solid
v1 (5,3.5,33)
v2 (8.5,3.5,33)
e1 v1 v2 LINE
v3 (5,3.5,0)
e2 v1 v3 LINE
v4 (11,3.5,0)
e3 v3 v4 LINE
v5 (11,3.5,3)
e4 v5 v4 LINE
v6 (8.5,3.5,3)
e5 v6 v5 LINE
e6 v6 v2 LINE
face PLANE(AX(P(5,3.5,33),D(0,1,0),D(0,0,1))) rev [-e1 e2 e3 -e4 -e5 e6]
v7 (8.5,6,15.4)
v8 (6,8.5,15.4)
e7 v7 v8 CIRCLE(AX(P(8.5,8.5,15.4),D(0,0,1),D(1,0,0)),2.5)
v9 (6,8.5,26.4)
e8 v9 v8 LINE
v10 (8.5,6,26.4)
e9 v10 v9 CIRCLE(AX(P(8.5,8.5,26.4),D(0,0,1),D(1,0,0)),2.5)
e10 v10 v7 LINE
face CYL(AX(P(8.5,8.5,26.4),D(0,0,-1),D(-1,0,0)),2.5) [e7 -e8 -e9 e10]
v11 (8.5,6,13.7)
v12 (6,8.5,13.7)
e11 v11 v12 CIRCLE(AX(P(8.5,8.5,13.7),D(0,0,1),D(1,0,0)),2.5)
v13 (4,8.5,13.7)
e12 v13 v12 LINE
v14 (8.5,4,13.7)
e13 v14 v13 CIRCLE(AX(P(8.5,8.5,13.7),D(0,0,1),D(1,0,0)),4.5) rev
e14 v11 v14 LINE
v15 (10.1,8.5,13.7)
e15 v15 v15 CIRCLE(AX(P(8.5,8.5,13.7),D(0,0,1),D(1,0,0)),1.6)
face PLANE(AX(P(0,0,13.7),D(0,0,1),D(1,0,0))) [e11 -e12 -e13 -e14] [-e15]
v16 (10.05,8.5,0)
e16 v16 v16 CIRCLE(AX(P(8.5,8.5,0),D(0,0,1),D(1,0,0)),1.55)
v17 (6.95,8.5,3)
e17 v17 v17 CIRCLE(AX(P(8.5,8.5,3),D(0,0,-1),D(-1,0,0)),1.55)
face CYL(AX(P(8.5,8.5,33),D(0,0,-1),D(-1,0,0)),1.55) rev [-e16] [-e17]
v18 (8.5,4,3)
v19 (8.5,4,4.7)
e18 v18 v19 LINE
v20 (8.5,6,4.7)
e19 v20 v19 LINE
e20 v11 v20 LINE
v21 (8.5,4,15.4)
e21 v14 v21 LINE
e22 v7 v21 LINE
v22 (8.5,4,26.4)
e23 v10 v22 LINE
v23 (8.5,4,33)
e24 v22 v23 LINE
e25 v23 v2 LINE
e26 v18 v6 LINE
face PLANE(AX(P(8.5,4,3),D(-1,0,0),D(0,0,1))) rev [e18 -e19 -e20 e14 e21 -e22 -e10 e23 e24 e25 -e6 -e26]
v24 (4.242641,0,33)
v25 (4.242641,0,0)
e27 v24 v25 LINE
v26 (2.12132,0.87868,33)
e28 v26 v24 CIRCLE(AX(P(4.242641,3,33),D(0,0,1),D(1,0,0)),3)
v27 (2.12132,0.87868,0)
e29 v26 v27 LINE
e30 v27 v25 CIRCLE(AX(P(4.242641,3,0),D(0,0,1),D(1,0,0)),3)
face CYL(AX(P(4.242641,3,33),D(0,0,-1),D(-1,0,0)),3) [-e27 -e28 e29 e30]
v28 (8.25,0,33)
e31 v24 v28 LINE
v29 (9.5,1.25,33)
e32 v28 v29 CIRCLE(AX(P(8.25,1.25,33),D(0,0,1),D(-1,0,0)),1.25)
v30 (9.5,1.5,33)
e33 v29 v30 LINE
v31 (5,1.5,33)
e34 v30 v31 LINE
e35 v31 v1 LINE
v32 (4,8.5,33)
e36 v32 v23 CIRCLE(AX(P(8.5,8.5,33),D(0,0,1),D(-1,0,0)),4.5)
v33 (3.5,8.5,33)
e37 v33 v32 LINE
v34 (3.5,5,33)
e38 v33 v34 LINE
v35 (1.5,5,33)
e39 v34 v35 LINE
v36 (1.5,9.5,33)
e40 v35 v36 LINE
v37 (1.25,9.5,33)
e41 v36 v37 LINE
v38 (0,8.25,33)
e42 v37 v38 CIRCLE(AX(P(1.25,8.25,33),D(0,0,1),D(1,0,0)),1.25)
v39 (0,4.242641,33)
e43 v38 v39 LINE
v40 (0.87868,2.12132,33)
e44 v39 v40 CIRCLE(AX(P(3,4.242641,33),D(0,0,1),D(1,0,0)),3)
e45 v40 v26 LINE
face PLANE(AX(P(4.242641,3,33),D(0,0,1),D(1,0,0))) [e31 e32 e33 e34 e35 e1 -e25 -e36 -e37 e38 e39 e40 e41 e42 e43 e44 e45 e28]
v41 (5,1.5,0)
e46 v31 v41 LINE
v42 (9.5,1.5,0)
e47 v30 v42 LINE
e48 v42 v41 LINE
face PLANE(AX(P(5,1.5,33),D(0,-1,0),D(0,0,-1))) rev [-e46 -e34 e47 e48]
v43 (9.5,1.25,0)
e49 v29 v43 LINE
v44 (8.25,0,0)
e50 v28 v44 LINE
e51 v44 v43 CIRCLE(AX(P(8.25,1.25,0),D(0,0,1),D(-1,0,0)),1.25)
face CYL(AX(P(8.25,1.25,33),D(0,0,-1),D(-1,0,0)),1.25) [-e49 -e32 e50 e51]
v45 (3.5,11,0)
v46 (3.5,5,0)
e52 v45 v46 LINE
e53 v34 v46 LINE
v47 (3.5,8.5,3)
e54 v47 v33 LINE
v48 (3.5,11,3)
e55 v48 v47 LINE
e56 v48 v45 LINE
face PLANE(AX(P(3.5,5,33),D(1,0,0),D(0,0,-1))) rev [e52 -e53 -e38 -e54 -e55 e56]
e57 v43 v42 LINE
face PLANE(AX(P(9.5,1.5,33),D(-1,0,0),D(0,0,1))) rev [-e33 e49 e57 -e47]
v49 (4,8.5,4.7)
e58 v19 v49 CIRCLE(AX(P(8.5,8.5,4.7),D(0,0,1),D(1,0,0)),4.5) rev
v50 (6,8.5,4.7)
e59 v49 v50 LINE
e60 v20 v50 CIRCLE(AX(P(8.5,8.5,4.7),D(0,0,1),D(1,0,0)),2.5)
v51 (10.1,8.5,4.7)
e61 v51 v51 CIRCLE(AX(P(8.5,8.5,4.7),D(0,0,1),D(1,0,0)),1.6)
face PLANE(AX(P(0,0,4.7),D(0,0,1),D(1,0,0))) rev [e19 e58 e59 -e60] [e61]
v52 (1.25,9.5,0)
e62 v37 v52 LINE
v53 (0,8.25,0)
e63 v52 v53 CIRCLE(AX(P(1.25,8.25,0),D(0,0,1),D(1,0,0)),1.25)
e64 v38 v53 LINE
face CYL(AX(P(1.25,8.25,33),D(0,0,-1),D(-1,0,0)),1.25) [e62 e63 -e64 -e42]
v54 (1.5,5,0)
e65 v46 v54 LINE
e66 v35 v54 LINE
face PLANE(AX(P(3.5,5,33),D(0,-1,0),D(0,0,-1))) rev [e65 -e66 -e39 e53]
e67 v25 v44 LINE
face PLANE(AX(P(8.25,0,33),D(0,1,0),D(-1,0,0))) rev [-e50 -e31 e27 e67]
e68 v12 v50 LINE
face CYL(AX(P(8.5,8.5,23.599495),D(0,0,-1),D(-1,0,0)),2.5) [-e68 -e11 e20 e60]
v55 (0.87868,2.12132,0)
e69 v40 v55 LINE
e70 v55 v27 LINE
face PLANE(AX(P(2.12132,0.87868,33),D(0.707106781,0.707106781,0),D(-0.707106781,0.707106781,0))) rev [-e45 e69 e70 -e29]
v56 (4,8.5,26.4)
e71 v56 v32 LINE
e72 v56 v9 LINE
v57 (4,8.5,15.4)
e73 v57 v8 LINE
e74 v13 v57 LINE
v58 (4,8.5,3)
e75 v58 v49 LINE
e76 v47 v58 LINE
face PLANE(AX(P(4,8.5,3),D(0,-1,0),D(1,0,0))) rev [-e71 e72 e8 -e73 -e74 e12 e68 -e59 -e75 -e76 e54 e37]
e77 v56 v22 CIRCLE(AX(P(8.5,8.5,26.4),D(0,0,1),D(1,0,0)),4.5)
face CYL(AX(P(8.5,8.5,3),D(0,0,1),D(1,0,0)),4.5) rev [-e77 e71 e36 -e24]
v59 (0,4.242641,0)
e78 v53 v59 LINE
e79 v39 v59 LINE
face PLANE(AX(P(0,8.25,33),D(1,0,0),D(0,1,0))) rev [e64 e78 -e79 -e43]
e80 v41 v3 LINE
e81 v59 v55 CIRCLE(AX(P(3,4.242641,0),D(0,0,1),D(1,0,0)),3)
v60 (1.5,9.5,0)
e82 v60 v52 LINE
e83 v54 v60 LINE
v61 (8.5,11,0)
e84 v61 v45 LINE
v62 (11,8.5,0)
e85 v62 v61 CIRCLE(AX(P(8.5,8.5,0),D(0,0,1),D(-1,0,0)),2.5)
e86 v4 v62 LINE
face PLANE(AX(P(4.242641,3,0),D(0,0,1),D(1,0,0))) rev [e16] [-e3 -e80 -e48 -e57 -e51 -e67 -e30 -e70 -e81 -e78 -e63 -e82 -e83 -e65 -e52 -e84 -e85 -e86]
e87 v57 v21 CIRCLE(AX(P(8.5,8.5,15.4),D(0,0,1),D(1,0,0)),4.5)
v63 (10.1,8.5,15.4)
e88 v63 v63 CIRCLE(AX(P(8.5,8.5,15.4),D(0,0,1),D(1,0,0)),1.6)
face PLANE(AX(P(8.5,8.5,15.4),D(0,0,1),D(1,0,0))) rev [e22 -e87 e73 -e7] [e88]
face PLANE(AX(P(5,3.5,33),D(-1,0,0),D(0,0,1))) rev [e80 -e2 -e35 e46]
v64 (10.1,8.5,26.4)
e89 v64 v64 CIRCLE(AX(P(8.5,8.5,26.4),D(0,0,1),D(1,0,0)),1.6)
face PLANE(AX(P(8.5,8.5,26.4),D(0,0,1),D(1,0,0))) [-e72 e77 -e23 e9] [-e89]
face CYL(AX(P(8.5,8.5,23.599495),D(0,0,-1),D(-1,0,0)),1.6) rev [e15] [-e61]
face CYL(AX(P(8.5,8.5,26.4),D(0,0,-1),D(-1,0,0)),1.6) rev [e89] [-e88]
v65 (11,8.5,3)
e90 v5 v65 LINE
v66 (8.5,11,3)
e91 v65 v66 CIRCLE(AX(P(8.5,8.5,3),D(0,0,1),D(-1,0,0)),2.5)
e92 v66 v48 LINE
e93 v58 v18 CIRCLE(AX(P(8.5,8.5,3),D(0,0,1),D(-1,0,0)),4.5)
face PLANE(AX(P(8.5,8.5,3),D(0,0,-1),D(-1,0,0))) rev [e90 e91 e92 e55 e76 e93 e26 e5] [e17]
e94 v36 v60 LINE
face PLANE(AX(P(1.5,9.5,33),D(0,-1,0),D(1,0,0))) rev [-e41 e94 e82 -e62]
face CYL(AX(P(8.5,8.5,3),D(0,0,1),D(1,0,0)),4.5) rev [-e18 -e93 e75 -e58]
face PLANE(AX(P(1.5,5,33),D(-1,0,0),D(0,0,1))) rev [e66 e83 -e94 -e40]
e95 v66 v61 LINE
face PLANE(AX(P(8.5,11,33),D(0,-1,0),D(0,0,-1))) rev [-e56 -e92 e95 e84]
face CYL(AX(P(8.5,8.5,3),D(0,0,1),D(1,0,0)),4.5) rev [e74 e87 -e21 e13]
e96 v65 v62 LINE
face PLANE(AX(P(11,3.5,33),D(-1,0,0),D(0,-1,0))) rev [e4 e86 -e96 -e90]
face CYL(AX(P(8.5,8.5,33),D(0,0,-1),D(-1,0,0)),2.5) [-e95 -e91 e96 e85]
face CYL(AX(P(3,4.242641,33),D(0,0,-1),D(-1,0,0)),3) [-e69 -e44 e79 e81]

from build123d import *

# Parameters (mm, degrees)
SKETCH1_R              = 1.55
BOSS_EXTRUDE1_DEPTH    = 33
CUT_EXTRUDE2_START     = 3
CUT_EXTRUDE2_OUTLINE_R = 1.55
CUT_EXTRUDE2_DEPTH     = 30
BOSS_EXTRUDE3_START    = 15.4
SKETCH7_R              = 1.6
BOSS_EXTRUDE3_DEPTH    = 11
SKETCH14_R             = 1.6
BOSS_EXTRUDE4_DEPTH    = 9


# Read off the part's stored shape, not the designer's step: Cut-Extrude2
with BuildPart() as part:
    # Sketch1 → Boss-Extrude1 (new body)
    with BuildSketch(Plane.XY):
        with BuildLine():
            Line((9.5, 1.5), (9.5, 1.25))
            ThreePointArc((9.5, 1.25), (9.133883476, 0.366116524), (8.25, 0))
            Line((8.25, 0), (4.242640687, 0))
            ThreePointArc((4.242640687, 0), (3.09459039, 0.228361402), (2.121320344, 0.878679656))
            Line((2.121320344, 0.878679656), (0.878679656, 2.121320344))
            ThreePointArc((0.878679656, 2.121320344), (0.228361402, 3.09459039), (0, 4.242640687))
            Line((0, 4.242640687), (0, 8.25))
            ThreePointArc((0, 8.25), (0.366116524, 9.133883476), (1.25, 9.5))
            Line((1.25, 9.5), (1.5, 9.5))
            Line((1.5, 9.5), (1.5, 5))
            Line((1.5, 5), (3.5, 5))
            Line((3.5, 5), (3.5, 11))
            Line((3.5, 11), (8.5, 11))
            ThreePointArc((8.5, 11), (10.267766953, 10.267766953), (11, 8.5))
            Line((11, 8.5), (11, 3.5))
            Line((11, 3.5), (5, 3.5))
            Line((5, 3.5), (5, 1.5))
            Line((5, 1.5), (9.5, 1.5))
        make_face()
        with Locations((8.5, 8.5)):
            Circle(SKETCH1_R, mode=Mode.SUBTRACT)
    extrude(amount=BOSS_EXTRUDE1_DEPTH)

    # Cut-Extrude2 outline → Cut-Extrude2 (cut)
    with BuildSketch(Plane.XY.offset(CUT_EXTRUDE2_START)):
        with BuildLine():
            Line((3.5, 8.5), (4, 8.5))
            ThreePointArc((4, 8.5), (5.318019485, 5.318019485), (8.5, 4))
            Line((8.5, 4), (8.5, 3.5))
            Line((8.5, 3.5), (11, 3.5))
            Line((11, 3.5), (11, 8.5))
            ThreePointArc((11, 8.5), (10.267766953, 10.267766953), (8.5, 11))
            Line((8.5, 11), (3.5, 11))
            Line((3.5, 11), (3.5, 8.5))
        make_face()
        with Locations((8.5, 8.5)):
            Circle(CUT_EXTRUDE2_OUTLINE_R, mode=Mode.SUBTRACT)
    extrude(amount=CUT_EXTRUDE2_DEPTH, mode=Mode.SUBTRACT)

    # Sketch7 → Boss-Extrude3 (add)
    with BuildSketch(Plane.XY.offset(BOSS_EXTRUDE3_START)):
        with BuildLine():
            Line((8.5, 6), (8.5, 4))
            ThreePointArc((8.5, 4), (5.318019485, 5.318019485), (4, 8.5))
            Line((4, 8.5), (6, 8.5))
            ThreePointArc((6, 8.5), (10.267766953, 10.267766953), (8.5, 6))
        make_face()
        with Locations((8.5, 8.5)):
            Circle(SKETCH7_R, mode=Mode.SUBTRACT)
    extrude(amount=BOSS_EXTRUDE3_DEPTH)

    # Sketch14 → Boss-Extrude4 (add)
    with BuildSketch(Plane.XY.offset(4.7)):
        with BuildLine():
            Line((6, 8.5), (4, 8.5))
            ThreePointArc((4, 8.5), (5.318019485, 5.318019485), (8.5, 4))
            Line((8.5, 4), (8.5, 6))
            ThreePointArc((8.5, 6), (10.267766953, 10.267766953), (6, 8.5))
        make_face()
        with Locations((8.5, 8.5)):
            Circle(SKETCH14_R, mode=Mode.SUBTRACT)
    extrude(amount=BOSS_EXTRUDE4_DEPTH)


solid = part.part
